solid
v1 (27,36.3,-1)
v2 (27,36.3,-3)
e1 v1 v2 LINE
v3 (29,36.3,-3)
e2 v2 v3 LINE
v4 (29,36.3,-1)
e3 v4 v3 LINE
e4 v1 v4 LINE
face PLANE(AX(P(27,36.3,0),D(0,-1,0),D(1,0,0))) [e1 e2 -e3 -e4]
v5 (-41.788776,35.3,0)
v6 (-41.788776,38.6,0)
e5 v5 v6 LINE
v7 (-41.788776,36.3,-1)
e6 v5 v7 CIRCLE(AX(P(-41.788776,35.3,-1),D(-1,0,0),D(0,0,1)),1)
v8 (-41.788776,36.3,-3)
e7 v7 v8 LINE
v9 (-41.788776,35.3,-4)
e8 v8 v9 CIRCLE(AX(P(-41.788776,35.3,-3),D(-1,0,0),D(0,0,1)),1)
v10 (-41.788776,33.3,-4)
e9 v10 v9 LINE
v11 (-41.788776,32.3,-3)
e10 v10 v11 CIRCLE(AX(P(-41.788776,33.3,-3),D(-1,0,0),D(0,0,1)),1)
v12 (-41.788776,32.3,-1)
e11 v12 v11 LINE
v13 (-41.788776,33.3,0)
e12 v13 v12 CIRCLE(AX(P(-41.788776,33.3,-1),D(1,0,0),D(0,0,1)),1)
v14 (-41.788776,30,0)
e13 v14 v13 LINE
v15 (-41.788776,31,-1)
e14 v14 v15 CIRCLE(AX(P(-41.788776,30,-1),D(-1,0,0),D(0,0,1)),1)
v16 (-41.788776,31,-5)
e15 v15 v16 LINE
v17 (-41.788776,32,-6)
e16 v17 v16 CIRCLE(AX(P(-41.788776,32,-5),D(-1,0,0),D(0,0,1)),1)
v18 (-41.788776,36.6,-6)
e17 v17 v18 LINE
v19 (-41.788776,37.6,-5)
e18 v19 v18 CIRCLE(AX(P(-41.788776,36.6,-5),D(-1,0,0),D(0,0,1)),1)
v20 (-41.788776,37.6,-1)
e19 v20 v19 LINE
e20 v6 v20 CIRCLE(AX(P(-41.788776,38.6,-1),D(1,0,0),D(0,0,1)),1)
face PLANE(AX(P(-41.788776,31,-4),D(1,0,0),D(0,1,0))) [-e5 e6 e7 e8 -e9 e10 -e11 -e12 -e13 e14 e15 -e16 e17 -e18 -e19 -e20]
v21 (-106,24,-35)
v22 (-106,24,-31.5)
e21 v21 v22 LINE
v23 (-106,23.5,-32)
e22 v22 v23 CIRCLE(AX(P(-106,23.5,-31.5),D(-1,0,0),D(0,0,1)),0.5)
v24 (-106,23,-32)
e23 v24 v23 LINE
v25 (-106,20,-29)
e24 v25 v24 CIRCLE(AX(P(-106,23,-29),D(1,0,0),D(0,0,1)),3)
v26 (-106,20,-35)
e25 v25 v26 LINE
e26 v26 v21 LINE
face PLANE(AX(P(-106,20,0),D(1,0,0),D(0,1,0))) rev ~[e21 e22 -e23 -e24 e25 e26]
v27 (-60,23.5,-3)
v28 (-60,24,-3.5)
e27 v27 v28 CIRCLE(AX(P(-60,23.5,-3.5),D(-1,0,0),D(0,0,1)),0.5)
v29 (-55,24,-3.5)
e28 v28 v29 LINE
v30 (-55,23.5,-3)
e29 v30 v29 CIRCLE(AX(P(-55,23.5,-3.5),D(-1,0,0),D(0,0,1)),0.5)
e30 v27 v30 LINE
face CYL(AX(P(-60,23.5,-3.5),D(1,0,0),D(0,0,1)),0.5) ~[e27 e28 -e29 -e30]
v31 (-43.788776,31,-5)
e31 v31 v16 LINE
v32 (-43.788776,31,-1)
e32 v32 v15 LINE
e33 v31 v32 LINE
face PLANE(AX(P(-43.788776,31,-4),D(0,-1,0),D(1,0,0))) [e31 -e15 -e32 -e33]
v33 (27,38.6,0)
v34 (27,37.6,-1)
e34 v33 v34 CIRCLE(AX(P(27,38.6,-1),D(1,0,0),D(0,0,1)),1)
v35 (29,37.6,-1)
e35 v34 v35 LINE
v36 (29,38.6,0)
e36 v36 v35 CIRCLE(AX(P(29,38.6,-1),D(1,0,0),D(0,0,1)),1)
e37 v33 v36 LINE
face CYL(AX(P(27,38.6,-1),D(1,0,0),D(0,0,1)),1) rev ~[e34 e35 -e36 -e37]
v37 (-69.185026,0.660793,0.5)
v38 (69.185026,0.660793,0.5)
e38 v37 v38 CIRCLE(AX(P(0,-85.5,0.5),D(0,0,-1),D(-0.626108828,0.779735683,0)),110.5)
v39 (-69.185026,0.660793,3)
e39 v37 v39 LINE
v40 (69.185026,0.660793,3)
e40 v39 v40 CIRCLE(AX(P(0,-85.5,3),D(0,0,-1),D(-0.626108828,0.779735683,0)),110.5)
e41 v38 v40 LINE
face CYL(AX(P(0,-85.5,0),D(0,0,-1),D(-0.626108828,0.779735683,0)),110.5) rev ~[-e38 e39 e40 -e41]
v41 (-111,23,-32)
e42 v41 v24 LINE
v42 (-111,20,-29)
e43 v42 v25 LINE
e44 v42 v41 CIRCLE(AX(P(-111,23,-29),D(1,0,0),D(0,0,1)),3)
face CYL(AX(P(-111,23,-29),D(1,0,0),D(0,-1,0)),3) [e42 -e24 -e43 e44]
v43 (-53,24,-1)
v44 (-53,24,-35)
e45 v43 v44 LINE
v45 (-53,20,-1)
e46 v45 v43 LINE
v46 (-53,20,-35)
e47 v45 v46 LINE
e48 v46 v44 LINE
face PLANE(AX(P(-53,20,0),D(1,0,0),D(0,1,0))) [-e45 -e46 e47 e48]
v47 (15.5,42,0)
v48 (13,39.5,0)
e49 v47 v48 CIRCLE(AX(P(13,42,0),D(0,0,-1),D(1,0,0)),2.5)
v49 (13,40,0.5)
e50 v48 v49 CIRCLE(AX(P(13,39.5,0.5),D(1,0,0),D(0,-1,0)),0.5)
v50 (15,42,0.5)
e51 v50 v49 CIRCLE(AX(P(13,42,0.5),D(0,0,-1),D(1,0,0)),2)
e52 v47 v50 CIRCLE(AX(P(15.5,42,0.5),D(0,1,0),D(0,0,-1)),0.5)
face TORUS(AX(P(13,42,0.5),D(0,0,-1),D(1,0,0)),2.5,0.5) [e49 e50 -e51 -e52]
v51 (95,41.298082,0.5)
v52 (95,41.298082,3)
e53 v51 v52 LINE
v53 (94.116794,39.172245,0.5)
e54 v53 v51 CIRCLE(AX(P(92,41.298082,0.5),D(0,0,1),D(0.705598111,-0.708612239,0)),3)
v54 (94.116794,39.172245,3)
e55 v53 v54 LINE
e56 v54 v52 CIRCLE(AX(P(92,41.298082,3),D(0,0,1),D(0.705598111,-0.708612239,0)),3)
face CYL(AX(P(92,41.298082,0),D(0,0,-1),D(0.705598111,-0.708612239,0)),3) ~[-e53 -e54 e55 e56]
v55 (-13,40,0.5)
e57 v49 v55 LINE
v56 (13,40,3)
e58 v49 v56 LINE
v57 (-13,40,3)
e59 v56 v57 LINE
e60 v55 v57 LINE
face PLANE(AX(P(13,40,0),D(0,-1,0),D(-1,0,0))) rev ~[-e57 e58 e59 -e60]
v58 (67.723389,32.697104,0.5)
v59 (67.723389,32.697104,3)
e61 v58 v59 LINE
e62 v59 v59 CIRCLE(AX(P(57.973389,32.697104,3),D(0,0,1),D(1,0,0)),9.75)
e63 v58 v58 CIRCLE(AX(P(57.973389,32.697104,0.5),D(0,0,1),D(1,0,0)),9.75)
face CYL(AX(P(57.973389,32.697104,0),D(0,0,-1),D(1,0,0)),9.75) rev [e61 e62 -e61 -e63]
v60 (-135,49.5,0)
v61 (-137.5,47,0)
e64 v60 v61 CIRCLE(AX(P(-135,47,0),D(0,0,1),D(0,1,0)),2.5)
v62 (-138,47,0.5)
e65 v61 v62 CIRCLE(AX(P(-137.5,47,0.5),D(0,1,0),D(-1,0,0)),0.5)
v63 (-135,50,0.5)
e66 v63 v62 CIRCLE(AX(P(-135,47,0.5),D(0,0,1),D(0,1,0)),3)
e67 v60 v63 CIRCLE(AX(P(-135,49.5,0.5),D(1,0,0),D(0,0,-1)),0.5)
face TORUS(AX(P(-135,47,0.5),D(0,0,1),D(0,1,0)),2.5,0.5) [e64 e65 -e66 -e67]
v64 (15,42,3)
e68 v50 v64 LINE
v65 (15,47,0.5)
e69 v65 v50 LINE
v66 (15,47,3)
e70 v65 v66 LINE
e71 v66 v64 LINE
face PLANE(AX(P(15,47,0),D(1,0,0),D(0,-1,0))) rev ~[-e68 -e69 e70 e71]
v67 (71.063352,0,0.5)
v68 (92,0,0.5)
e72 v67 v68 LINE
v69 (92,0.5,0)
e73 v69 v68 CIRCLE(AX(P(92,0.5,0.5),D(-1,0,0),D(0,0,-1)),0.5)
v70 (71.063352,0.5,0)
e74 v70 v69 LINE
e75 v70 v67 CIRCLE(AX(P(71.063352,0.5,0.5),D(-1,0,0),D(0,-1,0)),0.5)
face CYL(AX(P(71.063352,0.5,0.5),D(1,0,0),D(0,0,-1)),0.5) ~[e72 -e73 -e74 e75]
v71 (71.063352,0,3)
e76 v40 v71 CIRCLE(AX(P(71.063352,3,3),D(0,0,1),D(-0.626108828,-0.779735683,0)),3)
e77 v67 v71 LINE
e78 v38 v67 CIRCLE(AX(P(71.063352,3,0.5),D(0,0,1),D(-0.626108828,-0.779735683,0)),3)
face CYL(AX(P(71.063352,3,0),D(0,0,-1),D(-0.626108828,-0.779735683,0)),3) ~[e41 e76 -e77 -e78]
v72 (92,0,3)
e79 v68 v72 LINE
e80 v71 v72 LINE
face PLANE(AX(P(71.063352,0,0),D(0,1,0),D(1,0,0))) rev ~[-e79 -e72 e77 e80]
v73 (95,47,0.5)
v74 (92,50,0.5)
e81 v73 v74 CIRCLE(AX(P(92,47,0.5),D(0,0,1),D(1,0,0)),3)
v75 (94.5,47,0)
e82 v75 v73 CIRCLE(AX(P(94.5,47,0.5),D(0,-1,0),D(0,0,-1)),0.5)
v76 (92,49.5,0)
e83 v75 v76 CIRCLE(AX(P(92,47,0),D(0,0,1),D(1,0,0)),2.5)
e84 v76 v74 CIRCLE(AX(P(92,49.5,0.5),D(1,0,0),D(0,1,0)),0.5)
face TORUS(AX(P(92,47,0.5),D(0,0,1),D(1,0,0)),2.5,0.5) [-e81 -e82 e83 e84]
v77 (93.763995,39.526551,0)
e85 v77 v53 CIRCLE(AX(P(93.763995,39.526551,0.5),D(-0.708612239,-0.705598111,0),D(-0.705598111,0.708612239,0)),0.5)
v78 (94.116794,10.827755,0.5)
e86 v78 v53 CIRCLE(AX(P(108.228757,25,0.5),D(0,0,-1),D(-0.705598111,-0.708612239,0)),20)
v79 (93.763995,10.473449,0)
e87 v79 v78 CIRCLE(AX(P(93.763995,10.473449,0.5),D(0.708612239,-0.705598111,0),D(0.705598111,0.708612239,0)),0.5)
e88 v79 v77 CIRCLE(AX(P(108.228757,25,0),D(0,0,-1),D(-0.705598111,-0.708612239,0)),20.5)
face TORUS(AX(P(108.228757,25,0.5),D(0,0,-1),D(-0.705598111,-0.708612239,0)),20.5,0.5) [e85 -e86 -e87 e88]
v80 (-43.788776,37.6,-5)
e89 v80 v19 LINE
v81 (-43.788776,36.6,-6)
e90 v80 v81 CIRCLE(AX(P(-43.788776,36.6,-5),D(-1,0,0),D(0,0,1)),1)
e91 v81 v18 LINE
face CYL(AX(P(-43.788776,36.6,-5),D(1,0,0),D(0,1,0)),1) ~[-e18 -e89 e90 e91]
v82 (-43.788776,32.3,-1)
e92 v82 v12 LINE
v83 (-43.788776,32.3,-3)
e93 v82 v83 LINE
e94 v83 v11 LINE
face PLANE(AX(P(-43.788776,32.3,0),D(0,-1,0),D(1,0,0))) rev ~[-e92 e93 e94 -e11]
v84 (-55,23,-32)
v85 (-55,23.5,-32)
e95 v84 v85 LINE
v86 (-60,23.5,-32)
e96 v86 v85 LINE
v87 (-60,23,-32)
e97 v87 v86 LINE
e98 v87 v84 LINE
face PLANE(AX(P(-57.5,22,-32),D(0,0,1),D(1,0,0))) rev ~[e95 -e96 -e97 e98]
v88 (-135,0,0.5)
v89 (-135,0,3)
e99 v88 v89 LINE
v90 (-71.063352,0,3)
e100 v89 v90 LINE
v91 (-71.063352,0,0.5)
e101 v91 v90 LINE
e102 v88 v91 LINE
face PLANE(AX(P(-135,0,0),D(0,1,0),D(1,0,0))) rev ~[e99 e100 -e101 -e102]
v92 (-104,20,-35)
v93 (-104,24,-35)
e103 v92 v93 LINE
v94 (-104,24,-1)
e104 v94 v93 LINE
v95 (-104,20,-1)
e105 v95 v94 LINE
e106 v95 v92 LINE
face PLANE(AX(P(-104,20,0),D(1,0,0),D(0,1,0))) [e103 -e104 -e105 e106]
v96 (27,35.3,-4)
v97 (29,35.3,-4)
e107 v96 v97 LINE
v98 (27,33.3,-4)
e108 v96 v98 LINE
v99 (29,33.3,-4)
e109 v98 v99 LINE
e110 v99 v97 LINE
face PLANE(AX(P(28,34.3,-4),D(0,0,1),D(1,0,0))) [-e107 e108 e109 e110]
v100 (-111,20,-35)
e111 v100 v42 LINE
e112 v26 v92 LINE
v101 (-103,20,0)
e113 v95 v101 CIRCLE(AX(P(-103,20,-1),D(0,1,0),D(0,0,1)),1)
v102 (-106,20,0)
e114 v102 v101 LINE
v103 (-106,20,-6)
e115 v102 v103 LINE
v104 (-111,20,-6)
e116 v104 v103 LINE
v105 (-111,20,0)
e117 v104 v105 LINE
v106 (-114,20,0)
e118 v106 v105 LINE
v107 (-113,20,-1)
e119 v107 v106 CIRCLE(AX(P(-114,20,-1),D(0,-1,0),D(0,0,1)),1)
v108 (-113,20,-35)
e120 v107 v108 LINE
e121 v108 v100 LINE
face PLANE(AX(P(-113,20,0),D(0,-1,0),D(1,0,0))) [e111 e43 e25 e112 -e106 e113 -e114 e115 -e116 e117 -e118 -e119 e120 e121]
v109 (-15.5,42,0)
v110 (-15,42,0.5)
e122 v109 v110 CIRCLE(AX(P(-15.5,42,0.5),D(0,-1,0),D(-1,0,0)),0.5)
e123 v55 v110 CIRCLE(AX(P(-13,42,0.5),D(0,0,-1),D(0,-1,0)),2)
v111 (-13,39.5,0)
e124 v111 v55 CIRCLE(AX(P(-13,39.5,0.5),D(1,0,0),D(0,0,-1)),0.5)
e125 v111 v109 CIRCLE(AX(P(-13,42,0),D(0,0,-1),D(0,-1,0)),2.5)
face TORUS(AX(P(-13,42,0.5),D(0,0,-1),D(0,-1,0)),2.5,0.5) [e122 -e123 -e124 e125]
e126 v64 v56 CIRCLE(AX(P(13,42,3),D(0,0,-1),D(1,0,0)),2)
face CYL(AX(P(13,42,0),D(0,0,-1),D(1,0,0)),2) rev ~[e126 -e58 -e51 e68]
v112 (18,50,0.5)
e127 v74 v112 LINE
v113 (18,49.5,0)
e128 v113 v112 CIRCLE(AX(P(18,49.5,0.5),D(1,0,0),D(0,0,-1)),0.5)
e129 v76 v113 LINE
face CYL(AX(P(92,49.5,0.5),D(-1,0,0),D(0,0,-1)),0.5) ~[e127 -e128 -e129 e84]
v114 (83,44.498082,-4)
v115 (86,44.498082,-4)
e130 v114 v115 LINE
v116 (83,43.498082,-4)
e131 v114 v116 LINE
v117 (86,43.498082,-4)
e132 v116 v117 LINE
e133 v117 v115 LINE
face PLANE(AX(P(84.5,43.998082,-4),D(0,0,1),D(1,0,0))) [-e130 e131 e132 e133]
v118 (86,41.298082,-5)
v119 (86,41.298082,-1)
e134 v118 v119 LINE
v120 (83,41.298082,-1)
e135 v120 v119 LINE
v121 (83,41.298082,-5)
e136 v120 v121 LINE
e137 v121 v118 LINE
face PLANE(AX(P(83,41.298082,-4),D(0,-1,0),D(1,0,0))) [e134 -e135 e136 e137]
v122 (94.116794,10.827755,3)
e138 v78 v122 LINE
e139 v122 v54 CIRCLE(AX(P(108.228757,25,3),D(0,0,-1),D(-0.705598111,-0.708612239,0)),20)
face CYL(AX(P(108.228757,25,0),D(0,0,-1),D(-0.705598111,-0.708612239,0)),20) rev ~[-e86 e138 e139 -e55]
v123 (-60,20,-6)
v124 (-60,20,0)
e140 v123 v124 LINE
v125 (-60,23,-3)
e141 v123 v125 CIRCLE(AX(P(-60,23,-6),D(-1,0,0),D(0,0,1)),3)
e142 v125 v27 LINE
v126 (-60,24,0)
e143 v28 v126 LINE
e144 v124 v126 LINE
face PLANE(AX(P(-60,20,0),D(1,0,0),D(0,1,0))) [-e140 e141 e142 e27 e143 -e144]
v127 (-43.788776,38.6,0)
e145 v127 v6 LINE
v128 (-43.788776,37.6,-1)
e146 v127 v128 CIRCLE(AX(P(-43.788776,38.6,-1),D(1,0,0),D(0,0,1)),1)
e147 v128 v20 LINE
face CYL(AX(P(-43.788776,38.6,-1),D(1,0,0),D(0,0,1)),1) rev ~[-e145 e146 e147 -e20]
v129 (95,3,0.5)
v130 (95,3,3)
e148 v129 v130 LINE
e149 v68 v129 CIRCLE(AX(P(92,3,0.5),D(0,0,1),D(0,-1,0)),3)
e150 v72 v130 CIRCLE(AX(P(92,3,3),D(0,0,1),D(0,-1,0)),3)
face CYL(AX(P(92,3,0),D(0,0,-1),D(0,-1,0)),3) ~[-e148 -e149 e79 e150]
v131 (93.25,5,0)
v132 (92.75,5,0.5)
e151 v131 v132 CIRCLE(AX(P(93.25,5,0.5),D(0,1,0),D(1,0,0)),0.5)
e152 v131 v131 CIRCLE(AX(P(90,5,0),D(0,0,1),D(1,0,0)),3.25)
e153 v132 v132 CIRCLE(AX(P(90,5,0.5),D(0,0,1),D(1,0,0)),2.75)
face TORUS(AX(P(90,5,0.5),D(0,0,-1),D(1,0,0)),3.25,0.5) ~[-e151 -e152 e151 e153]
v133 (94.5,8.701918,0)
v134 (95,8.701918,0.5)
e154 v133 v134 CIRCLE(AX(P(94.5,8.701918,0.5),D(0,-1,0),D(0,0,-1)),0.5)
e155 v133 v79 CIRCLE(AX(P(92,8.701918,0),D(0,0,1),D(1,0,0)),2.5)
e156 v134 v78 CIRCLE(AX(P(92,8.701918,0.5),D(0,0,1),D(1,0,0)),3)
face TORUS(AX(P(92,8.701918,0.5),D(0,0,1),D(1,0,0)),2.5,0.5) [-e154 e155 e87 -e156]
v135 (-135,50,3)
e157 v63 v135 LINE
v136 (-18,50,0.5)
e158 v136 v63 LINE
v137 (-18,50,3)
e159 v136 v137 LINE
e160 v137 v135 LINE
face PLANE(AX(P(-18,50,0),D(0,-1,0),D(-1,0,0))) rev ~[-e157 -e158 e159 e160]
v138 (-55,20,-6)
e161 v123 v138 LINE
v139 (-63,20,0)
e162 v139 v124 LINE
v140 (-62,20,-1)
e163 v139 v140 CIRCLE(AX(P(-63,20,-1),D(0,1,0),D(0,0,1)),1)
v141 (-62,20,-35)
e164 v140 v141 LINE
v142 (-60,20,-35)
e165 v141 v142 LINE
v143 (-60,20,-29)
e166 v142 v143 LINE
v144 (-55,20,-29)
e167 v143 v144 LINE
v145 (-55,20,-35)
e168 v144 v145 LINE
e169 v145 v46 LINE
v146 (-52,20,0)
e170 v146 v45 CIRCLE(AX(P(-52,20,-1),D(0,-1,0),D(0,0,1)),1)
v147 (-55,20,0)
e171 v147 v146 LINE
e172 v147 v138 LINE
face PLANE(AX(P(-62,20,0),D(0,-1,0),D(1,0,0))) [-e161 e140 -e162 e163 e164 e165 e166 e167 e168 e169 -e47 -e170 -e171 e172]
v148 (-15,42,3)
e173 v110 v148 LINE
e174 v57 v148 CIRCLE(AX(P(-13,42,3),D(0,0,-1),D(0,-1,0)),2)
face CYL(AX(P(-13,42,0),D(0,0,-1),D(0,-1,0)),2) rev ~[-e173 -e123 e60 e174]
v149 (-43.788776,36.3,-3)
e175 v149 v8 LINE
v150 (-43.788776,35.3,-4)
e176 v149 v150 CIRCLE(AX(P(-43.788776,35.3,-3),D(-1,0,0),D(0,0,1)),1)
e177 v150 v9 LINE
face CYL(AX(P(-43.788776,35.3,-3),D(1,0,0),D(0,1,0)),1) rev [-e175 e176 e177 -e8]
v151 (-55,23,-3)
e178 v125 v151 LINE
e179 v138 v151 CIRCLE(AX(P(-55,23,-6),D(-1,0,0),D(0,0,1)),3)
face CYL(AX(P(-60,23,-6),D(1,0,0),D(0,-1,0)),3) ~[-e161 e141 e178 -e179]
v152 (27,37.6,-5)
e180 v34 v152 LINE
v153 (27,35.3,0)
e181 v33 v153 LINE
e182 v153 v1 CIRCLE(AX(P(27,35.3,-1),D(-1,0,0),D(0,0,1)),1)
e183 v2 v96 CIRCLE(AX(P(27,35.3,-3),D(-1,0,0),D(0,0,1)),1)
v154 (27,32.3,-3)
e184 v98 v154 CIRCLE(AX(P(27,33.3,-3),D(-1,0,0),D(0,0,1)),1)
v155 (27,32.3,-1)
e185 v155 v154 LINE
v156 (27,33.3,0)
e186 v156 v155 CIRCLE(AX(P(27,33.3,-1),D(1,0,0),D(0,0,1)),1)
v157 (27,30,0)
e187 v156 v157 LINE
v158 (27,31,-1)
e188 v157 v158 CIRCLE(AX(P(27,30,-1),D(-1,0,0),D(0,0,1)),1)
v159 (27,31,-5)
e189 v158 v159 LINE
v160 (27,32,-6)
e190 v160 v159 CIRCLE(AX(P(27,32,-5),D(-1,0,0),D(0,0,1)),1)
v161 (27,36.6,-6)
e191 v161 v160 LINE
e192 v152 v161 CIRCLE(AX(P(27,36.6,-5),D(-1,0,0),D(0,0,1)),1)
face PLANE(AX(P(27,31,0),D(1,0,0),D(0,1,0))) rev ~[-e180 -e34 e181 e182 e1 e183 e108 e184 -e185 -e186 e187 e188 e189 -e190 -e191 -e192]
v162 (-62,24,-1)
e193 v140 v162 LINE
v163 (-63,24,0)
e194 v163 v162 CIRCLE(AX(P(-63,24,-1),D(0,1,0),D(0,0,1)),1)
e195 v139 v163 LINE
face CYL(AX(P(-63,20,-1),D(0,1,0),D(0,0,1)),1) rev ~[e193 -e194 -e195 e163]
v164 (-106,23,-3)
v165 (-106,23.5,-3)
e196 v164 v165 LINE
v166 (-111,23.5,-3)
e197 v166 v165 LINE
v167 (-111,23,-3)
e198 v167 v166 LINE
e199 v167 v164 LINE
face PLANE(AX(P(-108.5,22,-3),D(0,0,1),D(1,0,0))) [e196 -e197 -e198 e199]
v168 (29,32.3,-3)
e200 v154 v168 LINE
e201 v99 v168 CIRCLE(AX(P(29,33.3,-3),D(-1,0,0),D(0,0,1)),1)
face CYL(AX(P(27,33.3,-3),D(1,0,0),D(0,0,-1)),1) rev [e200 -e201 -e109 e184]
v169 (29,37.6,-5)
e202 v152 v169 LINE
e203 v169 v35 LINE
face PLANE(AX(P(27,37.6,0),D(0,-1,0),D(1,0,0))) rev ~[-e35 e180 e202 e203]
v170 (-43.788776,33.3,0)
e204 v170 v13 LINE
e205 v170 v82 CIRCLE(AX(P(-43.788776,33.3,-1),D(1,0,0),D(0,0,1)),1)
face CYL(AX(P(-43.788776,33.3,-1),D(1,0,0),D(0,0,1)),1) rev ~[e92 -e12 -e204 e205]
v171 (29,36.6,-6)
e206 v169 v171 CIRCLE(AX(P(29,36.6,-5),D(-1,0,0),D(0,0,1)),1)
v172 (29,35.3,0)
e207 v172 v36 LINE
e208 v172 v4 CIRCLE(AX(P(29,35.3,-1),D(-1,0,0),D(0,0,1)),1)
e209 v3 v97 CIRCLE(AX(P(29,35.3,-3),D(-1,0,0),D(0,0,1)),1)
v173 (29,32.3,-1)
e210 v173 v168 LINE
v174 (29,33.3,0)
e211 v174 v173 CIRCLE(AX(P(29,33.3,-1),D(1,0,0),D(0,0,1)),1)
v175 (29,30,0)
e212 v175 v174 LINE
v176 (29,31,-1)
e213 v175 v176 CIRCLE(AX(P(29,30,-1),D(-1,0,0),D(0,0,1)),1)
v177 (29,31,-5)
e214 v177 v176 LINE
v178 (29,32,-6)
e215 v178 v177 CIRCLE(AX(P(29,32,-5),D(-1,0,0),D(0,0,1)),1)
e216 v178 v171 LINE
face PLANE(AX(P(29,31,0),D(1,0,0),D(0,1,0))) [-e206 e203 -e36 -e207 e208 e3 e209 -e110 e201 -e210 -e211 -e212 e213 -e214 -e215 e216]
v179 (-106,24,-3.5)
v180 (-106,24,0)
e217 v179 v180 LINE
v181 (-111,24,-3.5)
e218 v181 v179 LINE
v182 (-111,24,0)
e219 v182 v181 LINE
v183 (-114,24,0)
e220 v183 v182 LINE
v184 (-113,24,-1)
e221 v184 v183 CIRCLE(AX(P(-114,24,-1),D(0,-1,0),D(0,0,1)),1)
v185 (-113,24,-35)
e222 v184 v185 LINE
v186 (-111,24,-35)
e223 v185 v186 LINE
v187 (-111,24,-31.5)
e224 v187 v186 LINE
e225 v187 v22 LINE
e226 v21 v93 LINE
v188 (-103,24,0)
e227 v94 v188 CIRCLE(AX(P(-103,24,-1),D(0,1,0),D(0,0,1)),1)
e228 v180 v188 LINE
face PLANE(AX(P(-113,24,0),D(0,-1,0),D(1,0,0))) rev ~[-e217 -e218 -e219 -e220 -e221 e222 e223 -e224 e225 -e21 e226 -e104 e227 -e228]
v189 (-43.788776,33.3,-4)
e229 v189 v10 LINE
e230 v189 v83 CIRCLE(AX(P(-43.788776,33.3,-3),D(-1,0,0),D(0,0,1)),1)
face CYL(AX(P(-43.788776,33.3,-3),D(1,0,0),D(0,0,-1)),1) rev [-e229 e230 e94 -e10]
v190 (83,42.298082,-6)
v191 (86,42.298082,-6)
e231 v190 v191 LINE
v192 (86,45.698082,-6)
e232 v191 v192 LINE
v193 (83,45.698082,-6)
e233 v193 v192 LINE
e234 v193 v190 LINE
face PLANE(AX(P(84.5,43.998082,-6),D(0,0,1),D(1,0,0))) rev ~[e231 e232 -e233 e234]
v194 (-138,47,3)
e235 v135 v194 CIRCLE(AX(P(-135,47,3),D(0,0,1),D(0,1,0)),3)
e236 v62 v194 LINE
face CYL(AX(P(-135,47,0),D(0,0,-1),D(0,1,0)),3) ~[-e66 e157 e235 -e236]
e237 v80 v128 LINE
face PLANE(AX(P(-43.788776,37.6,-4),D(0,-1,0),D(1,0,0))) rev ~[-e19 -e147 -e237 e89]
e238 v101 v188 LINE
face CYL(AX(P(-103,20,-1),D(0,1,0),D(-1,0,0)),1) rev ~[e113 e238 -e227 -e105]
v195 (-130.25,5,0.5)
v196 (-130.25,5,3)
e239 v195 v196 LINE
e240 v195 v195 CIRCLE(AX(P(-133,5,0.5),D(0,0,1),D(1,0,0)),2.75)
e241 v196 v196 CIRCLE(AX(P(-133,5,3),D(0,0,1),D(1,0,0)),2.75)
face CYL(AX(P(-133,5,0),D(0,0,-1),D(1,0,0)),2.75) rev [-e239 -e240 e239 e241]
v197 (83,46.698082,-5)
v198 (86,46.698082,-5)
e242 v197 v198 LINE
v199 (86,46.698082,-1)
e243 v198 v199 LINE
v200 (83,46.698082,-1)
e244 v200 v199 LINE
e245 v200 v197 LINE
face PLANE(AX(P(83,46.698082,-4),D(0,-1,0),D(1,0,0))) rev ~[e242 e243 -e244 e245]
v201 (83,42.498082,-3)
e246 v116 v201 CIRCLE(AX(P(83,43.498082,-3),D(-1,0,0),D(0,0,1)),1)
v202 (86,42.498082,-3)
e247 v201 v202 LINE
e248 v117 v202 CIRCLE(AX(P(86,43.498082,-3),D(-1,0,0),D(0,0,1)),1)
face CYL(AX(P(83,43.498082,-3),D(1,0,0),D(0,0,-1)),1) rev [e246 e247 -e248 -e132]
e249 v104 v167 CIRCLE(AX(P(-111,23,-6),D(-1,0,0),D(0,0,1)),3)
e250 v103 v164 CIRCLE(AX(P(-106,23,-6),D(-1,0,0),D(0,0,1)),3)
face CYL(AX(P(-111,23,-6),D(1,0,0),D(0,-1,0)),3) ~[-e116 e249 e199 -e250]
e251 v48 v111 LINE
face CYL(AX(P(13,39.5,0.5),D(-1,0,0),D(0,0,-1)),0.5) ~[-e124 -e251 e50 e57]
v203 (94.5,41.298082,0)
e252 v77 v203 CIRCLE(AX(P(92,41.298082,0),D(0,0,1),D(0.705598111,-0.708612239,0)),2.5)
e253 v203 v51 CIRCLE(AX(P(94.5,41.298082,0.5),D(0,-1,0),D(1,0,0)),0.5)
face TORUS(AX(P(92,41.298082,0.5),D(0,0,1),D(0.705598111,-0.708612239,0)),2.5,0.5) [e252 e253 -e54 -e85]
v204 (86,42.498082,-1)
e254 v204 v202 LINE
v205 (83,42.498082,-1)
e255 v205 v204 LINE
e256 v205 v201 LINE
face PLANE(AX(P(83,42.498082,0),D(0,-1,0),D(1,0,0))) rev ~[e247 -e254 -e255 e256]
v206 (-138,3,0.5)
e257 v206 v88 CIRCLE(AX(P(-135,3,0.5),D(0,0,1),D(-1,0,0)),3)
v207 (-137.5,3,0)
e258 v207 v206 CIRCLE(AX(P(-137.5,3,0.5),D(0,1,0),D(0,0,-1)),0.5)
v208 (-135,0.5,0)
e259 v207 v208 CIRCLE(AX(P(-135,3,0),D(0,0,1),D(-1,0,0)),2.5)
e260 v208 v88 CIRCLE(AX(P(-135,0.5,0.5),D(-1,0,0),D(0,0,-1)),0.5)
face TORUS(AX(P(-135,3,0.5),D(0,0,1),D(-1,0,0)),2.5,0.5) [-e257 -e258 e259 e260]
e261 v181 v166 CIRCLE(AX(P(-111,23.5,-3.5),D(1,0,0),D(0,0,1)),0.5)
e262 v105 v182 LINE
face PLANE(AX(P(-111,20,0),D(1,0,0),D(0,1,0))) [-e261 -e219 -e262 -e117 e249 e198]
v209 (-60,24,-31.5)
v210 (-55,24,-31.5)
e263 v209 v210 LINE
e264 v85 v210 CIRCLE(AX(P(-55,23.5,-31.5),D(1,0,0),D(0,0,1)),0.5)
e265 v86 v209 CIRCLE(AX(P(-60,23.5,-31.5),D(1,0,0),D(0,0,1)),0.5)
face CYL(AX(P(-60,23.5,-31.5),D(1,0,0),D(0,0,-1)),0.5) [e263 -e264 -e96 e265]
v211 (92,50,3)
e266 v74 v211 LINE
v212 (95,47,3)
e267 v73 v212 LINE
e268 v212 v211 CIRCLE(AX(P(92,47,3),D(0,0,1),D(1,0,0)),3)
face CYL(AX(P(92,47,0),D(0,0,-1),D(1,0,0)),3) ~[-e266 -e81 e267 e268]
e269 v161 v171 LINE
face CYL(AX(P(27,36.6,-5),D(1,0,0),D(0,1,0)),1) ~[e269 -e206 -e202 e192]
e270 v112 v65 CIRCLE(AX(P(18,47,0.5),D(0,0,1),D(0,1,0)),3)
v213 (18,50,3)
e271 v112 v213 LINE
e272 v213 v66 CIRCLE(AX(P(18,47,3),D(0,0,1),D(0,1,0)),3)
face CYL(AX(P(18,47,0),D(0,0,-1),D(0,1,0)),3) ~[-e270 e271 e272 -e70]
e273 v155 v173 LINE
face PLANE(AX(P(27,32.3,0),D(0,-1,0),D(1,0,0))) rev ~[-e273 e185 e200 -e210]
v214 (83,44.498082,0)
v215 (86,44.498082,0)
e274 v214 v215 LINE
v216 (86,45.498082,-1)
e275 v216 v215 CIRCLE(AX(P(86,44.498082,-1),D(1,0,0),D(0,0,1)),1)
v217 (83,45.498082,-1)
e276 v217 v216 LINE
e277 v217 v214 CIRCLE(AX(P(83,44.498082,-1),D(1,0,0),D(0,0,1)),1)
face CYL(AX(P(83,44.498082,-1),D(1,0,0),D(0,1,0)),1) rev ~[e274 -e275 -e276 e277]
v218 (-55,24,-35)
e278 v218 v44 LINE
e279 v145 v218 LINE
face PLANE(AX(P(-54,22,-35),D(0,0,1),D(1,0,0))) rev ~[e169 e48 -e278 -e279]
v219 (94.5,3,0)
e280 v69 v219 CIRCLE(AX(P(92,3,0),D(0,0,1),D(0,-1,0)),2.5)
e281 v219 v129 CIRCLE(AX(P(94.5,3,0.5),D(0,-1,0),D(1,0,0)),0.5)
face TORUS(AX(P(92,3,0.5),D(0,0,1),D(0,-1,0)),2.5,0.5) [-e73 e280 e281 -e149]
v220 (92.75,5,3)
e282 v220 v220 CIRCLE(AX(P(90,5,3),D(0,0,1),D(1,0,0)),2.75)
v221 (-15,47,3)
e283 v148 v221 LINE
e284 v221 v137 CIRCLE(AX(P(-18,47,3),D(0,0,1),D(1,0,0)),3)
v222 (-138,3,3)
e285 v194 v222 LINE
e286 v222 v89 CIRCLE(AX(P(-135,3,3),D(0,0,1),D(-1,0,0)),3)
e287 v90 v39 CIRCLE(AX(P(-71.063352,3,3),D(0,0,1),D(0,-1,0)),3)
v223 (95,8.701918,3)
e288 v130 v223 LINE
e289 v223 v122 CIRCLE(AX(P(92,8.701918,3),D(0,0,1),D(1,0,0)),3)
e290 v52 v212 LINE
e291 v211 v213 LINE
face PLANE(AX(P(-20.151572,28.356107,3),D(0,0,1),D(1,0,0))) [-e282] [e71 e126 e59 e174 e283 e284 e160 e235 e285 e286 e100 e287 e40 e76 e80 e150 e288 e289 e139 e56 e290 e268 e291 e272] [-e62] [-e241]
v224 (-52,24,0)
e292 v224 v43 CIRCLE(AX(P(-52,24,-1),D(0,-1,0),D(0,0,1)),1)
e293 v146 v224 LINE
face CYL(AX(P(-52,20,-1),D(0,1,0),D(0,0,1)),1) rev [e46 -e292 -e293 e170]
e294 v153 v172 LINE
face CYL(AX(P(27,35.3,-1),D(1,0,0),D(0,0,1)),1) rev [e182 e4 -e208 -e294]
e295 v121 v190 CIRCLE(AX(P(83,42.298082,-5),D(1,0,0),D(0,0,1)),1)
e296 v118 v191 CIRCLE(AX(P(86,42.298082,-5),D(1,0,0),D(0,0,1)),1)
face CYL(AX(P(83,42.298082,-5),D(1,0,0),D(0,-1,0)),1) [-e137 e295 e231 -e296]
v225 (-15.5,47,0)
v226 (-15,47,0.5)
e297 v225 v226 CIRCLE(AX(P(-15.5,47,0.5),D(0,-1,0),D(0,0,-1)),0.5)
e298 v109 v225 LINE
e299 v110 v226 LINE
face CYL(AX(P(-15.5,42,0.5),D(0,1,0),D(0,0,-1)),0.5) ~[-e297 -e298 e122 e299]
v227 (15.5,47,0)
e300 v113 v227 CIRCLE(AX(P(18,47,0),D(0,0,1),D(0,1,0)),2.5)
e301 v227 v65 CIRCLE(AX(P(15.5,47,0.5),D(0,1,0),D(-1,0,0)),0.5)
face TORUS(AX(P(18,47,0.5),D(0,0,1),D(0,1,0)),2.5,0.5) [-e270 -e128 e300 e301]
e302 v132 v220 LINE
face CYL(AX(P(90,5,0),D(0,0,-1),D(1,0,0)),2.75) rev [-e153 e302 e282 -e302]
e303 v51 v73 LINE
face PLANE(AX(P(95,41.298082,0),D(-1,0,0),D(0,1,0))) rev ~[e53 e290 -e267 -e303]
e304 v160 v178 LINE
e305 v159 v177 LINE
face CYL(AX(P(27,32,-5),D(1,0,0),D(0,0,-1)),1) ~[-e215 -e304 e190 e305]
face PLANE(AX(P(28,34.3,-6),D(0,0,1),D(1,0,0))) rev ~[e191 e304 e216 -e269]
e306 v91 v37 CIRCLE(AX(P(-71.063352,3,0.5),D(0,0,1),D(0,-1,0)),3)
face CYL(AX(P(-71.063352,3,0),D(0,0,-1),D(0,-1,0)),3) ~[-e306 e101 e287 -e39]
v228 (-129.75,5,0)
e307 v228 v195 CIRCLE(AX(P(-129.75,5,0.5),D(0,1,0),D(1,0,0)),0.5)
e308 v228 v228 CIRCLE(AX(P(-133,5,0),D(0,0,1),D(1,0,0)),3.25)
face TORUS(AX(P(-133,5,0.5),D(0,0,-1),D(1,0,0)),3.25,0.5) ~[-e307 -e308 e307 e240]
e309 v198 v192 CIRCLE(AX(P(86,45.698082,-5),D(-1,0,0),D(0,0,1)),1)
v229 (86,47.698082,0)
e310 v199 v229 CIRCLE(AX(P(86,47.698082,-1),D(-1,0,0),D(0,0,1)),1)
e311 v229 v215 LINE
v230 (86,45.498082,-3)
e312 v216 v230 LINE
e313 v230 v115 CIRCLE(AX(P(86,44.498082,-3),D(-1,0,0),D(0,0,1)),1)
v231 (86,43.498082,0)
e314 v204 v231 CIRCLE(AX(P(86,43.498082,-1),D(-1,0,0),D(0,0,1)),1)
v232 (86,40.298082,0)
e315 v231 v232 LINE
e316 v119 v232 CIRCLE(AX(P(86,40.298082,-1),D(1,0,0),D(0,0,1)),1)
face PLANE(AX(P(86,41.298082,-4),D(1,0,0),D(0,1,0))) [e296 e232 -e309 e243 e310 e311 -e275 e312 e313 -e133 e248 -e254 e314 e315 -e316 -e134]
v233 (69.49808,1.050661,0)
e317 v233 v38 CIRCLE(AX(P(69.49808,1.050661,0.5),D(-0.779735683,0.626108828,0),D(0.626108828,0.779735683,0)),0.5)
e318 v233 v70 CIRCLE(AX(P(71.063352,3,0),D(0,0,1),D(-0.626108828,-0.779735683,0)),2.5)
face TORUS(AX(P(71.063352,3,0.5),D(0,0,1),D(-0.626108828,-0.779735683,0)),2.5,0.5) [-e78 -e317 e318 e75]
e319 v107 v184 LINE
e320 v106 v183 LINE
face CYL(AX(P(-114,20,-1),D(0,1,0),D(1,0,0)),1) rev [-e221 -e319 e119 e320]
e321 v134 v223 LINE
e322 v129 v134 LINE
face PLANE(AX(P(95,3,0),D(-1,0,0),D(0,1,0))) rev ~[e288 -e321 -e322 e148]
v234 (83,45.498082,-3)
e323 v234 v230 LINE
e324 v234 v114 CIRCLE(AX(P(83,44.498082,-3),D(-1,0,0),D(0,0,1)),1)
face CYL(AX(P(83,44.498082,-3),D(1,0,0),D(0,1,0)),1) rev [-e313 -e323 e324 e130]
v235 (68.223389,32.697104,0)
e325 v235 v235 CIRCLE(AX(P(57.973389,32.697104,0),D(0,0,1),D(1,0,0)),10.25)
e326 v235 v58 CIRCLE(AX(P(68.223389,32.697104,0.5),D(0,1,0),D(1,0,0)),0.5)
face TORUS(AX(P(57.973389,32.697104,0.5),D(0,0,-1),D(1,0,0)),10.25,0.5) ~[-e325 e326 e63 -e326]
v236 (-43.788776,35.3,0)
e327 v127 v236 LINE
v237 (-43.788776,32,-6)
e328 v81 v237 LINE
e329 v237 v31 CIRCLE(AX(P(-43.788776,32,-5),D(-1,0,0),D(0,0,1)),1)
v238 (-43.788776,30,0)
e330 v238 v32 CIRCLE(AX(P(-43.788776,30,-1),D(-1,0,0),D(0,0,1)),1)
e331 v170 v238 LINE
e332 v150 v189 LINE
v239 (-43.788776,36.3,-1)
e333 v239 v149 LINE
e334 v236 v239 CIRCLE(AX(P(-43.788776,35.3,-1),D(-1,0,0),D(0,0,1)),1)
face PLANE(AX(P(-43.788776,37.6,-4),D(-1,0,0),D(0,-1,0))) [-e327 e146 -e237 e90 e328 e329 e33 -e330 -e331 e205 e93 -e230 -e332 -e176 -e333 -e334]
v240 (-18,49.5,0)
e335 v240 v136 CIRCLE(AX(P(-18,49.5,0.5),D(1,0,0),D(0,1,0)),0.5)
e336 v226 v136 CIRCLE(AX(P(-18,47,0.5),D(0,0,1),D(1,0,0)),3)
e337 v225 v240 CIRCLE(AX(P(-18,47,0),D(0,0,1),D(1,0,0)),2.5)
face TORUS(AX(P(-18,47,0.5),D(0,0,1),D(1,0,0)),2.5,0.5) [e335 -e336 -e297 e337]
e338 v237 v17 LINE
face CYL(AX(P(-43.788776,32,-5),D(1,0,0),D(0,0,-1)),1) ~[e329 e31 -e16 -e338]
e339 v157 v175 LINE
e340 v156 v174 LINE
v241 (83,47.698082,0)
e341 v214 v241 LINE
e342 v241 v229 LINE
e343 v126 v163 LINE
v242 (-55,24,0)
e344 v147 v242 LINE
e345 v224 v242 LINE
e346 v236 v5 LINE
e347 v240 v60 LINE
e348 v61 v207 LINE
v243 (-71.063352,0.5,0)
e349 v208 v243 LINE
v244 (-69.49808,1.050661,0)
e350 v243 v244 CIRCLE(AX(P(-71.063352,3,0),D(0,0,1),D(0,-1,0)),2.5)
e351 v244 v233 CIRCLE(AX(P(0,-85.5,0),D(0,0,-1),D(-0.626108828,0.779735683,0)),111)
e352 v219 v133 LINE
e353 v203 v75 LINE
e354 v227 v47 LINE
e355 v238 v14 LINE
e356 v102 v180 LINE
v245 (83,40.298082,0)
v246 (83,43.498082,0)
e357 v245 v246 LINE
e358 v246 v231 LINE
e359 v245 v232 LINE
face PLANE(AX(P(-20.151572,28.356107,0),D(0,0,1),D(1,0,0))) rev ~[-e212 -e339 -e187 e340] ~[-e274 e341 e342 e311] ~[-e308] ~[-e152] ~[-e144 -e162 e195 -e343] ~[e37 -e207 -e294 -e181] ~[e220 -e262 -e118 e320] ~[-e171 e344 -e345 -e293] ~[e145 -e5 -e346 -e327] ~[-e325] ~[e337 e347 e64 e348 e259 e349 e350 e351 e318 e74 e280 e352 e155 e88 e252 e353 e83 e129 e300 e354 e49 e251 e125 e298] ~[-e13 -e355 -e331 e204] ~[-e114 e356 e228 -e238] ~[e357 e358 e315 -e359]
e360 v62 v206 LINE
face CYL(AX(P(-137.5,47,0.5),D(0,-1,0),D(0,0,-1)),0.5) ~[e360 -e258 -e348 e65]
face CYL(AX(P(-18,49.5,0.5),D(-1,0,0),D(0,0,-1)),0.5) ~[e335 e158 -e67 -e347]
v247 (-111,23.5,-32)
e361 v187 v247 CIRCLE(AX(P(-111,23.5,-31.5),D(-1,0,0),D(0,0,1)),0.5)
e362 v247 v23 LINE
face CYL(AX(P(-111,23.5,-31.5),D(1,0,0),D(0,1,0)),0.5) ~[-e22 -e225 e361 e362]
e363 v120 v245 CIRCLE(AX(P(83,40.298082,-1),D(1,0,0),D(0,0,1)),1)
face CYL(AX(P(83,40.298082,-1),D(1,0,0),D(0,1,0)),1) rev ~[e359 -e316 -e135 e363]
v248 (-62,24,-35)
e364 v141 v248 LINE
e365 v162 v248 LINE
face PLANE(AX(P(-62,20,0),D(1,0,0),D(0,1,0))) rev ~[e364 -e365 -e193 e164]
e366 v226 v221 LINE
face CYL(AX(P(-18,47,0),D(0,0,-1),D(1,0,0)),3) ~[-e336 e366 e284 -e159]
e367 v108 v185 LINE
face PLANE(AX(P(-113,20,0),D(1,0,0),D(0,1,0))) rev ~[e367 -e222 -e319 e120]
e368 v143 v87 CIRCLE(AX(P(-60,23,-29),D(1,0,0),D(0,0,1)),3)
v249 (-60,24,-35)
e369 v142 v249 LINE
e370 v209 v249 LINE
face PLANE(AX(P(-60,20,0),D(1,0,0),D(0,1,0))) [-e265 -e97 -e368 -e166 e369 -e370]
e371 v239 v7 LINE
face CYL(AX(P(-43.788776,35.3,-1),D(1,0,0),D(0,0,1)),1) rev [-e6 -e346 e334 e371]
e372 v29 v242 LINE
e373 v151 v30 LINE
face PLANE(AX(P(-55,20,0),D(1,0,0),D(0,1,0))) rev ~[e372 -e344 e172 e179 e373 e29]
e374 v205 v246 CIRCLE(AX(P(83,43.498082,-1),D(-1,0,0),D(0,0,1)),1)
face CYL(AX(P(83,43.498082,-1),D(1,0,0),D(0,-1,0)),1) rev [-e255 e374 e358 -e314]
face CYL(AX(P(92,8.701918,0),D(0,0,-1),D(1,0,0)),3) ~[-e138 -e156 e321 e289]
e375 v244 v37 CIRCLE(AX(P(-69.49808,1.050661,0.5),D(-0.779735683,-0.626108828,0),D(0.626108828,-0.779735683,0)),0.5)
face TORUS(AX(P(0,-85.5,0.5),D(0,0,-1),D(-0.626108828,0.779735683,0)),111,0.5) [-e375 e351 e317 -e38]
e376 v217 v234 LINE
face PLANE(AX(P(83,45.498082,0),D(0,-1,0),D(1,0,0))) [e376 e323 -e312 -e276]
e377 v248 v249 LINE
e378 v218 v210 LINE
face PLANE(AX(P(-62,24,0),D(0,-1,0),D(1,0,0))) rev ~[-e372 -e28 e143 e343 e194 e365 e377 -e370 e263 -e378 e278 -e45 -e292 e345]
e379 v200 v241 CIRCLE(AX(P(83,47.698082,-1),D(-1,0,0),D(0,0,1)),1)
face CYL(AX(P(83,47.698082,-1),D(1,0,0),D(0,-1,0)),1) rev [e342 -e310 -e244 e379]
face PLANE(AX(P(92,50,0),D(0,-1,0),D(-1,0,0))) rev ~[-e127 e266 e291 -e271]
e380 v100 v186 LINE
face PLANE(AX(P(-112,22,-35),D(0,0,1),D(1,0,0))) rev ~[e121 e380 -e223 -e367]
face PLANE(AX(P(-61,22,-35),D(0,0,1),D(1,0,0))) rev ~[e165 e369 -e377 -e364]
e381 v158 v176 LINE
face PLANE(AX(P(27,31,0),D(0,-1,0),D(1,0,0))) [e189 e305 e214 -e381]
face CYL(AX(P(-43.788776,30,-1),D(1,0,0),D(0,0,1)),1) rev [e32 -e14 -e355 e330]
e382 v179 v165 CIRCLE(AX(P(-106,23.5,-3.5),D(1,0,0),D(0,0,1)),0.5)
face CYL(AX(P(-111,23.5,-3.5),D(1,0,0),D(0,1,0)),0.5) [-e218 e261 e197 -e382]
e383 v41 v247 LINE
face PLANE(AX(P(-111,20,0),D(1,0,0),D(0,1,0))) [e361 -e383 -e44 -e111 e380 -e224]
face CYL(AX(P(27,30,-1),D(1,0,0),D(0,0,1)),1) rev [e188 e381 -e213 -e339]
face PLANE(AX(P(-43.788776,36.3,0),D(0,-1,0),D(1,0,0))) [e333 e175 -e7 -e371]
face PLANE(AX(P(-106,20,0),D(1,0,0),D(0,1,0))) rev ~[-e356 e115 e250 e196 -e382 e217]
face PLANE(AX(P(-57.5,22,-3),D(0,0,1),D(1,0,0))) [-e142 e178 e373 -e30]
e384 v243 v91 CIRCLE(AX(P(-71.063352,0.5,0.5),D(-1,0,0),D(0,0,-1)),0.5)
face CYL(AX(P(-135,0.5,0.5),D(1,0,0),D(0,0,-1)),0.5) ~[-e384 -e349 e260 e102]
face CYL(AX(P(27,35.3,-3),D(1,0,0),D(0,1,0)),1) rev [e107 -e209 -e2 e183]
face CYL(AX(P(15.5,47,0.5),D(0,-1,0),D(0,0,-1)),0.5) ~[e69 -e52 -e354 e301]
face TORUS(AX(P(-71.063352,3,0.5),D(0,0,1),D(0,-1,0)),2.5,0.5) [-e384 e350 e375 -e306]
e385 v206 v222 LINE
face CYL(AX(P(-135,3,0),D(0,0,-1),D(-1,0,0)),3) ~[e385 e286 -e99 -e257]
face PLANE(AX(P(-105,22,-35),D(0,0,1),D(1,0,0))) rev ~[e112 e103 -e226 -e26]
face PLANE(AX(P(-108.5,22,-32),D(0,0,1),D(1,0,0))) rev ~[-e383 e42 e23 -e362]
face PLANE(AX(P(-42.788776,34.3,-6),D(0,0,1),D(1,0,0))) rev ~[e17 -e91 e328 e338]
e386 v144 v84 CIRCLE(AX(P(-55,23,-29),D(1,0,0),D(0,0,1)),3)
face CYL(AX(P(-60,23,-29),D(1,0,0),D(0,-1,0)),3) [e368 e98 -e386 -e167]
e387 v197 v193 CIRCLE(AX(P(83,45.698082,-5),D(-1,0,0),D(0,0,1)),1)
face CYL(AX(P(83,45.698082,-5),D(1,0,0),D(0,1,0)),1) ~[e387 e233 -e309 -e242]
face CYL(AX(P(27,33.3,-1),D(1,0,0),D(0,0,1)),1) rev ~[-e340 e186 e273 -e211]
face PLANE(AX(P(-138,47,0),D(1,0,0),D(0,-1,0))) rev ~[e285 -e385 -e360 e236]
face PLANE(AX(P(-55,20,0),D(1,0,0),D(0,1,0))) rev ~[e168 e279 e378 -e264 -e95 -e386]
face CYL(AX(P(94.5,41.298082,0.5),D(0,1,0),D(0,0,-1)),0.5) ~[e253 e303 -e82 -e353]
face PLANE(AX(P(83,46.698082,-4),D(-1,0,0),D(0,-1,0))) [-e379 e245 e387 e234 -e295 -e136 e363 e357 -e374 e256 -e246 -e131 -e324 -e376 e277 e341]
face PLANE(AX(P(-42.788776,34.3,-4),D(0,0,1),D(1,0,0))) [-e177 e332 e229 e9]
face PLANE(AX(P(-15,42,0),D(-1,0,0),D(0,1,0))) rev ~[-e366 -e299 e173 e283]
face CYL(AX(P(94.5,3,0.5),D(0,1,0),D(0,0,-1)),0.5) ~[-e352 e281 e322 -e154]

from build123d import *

# Parameters (mm, degrees)
F0_R      = 2.75
F0_R_2    = 9.75
F0_W      = 5
F0_H      = 4
F0_W_2    = 2
F0_H_2    = 1.3
F0_W_3    = 3
F0_H_3    = 3
F0_H_4    = 1.2
F1_DEPTH  = 3
F2_DEPTH  = 4
F3_START  = -4
F3_DEPTH  = 2
F4_DEPTH  = 35
F5_START  = -3
F5_DEPTH  = 29
F6_R      = 3
F7_R      = 0.5
F8_R      = 1
F9_DEPTH  = 4
F10_START = -4
F10_DEPTH = 2
F11_R     = 1


# Not quite as in the source:
# - a feature names something its author has since deleted; it is built from what else it names


with BuildPart() as f1:
    # F0 (on Top) → F1 (new body)
    with BuildSketch(Plane.XY):
        with BuildLine():
            Line((13, 40), (0, 40))
            Line((0, 40), (-13, 40))
            ThreePointArc((-13, 40), (-14.4142135624, 40.5857864376), (-15, 42))
            Line((-15, 42), (-15, 47))
            ThreePointArc((-15, 47), (-15.8786796564, 49.1213203436), (-18, 50))
            Line((-18, 50), (-128, 50))
            Line((-128, 50), (-135, 50))
            ThreePointArc((-135, 50), (-137.1213203436, 49.1213203436), (-138, 47))
            Line((-138, 47), (-138, 3))
            ThreePointArc((-138, 3), (-137.1213203436, 0.8786796564), (-135, 0))
            Line((-135, 0), (-128, 0))
            Line((-128, 0), (-71.0633520178, 0))
            ThreePointArc((-71.0633520178, 0), (-70.0677670504, 0.1700157999), (-69.1850255327, 0.6607929515))
            ThreePointArc((-69.1850255327, 0.6607929515), (0, 25), (69.1850255327, 0.6607929515))
            ThreePointArc((69.1850255327, 0.6607929515), (70.0677670504, 0.1700157999), (71.0633520178, 0))
            Line((71.0633520178, 0), (85, 0))
            Line((85, 0), (92, 0))
            ThreePointArc((92, 0), (94.1213203436, 0.8786796564), (95, 3))
            Line((95, 3), (95, 8.7019184973))
            ThreePointArc((95, 8.7019184973), (94.7704135973, 9.8529217554), (94.1167943333, 10.8277552151))
            ThreePointArc((94.1167943333, 10.8277552151), (88.2287565553, 25), (94.1167943333, 39.1722447849))
            ThreePointArc((94.1167943333, 39.1722447849), (94.7704135973, 40.1470782446), (95, 41.2980815027))
            Line((95, 41.2980815027), (95, 47))
            ThreePointArc((95, 47), (94.1213203436, 49.1213203436), (92, 50))
            Line((92, 50), (85, 50))
            Line((85, 50), (18, 50))
            ThreePointArc((18, 50), (15.8786796564, 49.1213203436), (15, 47))
            Line((15, 47), (15, 42))
            ThreePointArc((15, 42), (14.4142135624, 40.5857864376), (13, 40))
        make_face()
        with Locations((-133, 5)):
            Circle(F0_R, mode=Mode.SUBTRACT)
        Polygon((-111, 20), (-113, 20), (-113, 24), (-111, 24), (-106, 24), (-104, 24), (-104, 20), (-106, 20), align=None, mode=Mode.SUBTRACT)
        Polygon((-53, 24), (-53, 20), (-55, 20), (-60, 20), (-62, 20), (-62, 24), (-60, 24), (-55, 24), align=None, mode=Mode.SUBTRACT)
        with Locations((90, 5)):
            Circle(F0_R, mode=Mode.SUBTRACT)
        Polygon((-41.7887758017, 31), (-43.7887758017, 31), (-43.7887758017, 32.3), (-43.7887758017, 36.3), (-43.7887758017, 37.6), (-41.7887758017, 37.6), (-41.7887758017, 36.3), (-41.7887758017, 32.3), align=None, mode=Mode.SUBTRACT)
        Polygon((29, 31), (27, 31), (27, 32.3), (27, 36.3), (27, 37.6), (29, 37.6), (29, 36.3), (29, 32.3), align=None, mode=Mode.SUBTRACT)
        with Locations((57.9733885825, 32.6971039176)):
            Circle(F0_R_2, mode=Mode.SUBTRACT)
        Polygon((86, 42.4980815027), (86, 41.2980815027), (83, 41.2980815027), (83, 42.4980815027), (83, 45.4980815027), (83, 46.6980815027), (86, 46.6980815027), (86, 45.4980815027), align=None, mode=Mode.SUBTRACT)
        with Locations((-108.5, 22)):
            Rectangle(F0_W, F0_H)
        with Locations((-112, 22)):
            Rectangle(F0_W_2, F0_H)
        with Locations((-105, 22)):
            Rectangle(F0_W_2, F0_H)
        with Locations((-57.5, 22)):
            Rectangle(F0_W, F0_H)
        with Locations((-61, 22)):
            Rectangle(F0_W_2, F0_H)
        with Locations((-54, 22)):
            Rectangle(F0_W_2, F0_H)
        with Locations((-42.7887758017, 34.3)):
            Rectangle(F0_W_2, F0_H)
        with Locations((-42.7887758017, 31.65)):
            Rectangle(F0_W_2, F0_H_2)
        with Locations((-42.7887758017, 36.95)):
            Rectangle(F0_W_2, F0_H_2)
        with Locations((28, 34.3)):
            Rectangle(F0_W_2, F0_H)
        with Locations((28, 31.65)):
            Rectangle(F0_W_2, F0_H_2)
        with Locations((28, 36.95)):
            Rectangle(F0_W_2, F0_H_2)
        with Locations((84.5, 43.9980815027)):
            Rectangle(F0_W_3, F0_H_3)
        with Locations((84.5, 46.0980815027)):
            Rectangle(F0_W_3, F0_H_4)
        with Locations((84.5, 41.8980815027)):
            Rectangle(F0_W_3, F0_H_4)
    extrude(amount=F1_DEPTH)

    # F0 (on Top) → F2 (join)
    with BuildSketch(Plane.XY):
        with Locations((-42.7887758017, 36.95)):
            Rectangle(F0_W_2, F0_H_2)
        with Locations((-42.7887758017, 31.65)):
            Rectangle(F0_W_2, F0_H_2)
        with Locations((28, 31.65)):
            Rectangle(F0_W_2, F0_H_2)
        with Locations((28, 36.95)):
            Rectangle(F0_W_2, F0_H_2)
    extrude(amount=-F2_DEPTH)

    # F0 (on Top) → F3 (join)
    with BuildSketch(Plane.XY.offset(F3_START)):
        with Locations((-42.7887758017, 34.3)):
            Rectangle(F0_W_2, F0_H)
        with Locations((-42.7887758017, 36.95)):
            Rectangle(F0_W_2, F0_H_2)
        with Locations((-42.7887758017, 31.65)):
            Rectangle(F0_W_2, F0_H_2)
        with Locations((28, 34.3)):
            Rectangle(F0_W_2, F0_H)
        with Locations((28, 36.95)):
            Rectangle(F0_W_2, F0_H_2)
        with Locations((28, 31.65)):
            Rectangle(F0_W_2, F0_H_2)
    extrude(amount=-F3_DEPTH)

    # F0 (on Top) → F4 (join)
    with BuildSketch(Plane.XY):
        with Locations((-112, 22)):
            Rectangle(F0_W_2, F0_H)
        with Locations((-105, 22)):
            Rectangle(F0_W_2, F0_H)
        with Locations((-61, 22)):
            Rectangle(F0_W_2, F0_H)
        with Locations((-54, 22)):
            Rectangle(F0_W_2, F0_H)
    extrude(amount=-F4_DEPTH)

    # F0 (on Top) → F5 (join)
    with BuildSketch(Plane.XY.offset(F5_START)):
        with Locations((-108.5, 22)):
            Rectangle(F0_W, F0_H)
        with Locations((-57.5, 22)):
            Rectangle(F0_W, F0_H)
    extrude(amount=-F5_DEPTH)

    # F6
    f6_edges = [f1.edges().sort_by_distance(p)[0] for p in [
        (-57.5, 20, -32),
        (-57.5, 20, -3),
        (-108.5, 20, -32),
        (-108.5, 20, -3),
    ]]
    fillet(f6_edges, radius=F6_R)

    # F7
    f7_edges = [f1.edges().sort_by_distance(p)[0] for p in [
        (-103.031676, 0, 0),
        (-135.75, 5, 0),
        (48.223389, 32.697104, 0),
        (87.25, 5, 0),
        (-57.5, 24, -32),
        (-57.5, 24, -3),
        (-108.5, 24, -3),
        (-108.5, 24, -32),
    ]]
    fillet(f7_edges, radius=F7_R)

    # F8
    f8_edges = [f1.edges().sort_by_distance(p)[0] for p in [
        (-42.788776, 32.3, 0),
        (-42.788776, 36.3, 0),
        (28, 32.3, 0),
        (-42.788776, 36.3, -4),
        (-42.788776, 32.3, -4),
        (28, 32.3, -4),
        (28, 36.3, 0),
        (28, 36.3, -4),
        (28, 31, -6),
        (28, 37.6, -6),
        (28, 37.6, 0),
        (28, 31, 0),
        (-42.788776, 37.6, -6),
        (-42.788776, 37.6, 0),
        (-42.788776, 31, 0),
        (-42.788776, 31, -6),
        (-62, 22, 0),
        (-53, 22, 0),
        (-113, 22, 0),
        (-104, 22, 0),
    ]]
    fillet(f8_edges, radius=F8_R)

    # F0 (on Top) → F9 (join)
    with BuildSketch(Plane.XY):
        with Locations((84.5, 41.8980815027)):
            Rectangle(F0_W_3, F0_H_4)
        with Locations((84.5, 46.0980815027)):
            Rectangle(F0_W_3, F0_H_4)
    extrude(amount=-F9_DEPTH)

    # F0 (on Top) → F10 (join)
    with BuildSketch(Plane.XY.offset(F10_START)):
        with Locations((84.5, 43.9980815027)):
            Rectangle(F0_W_3, F0_H_3)
        with Locations((84.5, 41.8980815027)):
            Rectangle(F0_W_3, F0_H_4)
        with Locations((84.5, 46.0980815027)):
            Rectangle(F0_W_3, F0_H_4)
    extrude(amount=-F10_DEPTH)

    # F11
    f11_edges = [f1.edges().sort_by_distance(p)[0] for p in [
        (84.5, 41.298082, -6),
        (84.5, 46.698082, -6),
        (84.5, 42.498082, -4),
        (84.5, 45.498082, -4),
        (84.5, 45.498082, 0),
        (84.5, 42.498082, 0),
        (84.5, 41.298082, 0),
        (84.5, 46.698082, 0),
    ]]
    fillet(f11_edges, radius=F11_R)


solid = f1.part
